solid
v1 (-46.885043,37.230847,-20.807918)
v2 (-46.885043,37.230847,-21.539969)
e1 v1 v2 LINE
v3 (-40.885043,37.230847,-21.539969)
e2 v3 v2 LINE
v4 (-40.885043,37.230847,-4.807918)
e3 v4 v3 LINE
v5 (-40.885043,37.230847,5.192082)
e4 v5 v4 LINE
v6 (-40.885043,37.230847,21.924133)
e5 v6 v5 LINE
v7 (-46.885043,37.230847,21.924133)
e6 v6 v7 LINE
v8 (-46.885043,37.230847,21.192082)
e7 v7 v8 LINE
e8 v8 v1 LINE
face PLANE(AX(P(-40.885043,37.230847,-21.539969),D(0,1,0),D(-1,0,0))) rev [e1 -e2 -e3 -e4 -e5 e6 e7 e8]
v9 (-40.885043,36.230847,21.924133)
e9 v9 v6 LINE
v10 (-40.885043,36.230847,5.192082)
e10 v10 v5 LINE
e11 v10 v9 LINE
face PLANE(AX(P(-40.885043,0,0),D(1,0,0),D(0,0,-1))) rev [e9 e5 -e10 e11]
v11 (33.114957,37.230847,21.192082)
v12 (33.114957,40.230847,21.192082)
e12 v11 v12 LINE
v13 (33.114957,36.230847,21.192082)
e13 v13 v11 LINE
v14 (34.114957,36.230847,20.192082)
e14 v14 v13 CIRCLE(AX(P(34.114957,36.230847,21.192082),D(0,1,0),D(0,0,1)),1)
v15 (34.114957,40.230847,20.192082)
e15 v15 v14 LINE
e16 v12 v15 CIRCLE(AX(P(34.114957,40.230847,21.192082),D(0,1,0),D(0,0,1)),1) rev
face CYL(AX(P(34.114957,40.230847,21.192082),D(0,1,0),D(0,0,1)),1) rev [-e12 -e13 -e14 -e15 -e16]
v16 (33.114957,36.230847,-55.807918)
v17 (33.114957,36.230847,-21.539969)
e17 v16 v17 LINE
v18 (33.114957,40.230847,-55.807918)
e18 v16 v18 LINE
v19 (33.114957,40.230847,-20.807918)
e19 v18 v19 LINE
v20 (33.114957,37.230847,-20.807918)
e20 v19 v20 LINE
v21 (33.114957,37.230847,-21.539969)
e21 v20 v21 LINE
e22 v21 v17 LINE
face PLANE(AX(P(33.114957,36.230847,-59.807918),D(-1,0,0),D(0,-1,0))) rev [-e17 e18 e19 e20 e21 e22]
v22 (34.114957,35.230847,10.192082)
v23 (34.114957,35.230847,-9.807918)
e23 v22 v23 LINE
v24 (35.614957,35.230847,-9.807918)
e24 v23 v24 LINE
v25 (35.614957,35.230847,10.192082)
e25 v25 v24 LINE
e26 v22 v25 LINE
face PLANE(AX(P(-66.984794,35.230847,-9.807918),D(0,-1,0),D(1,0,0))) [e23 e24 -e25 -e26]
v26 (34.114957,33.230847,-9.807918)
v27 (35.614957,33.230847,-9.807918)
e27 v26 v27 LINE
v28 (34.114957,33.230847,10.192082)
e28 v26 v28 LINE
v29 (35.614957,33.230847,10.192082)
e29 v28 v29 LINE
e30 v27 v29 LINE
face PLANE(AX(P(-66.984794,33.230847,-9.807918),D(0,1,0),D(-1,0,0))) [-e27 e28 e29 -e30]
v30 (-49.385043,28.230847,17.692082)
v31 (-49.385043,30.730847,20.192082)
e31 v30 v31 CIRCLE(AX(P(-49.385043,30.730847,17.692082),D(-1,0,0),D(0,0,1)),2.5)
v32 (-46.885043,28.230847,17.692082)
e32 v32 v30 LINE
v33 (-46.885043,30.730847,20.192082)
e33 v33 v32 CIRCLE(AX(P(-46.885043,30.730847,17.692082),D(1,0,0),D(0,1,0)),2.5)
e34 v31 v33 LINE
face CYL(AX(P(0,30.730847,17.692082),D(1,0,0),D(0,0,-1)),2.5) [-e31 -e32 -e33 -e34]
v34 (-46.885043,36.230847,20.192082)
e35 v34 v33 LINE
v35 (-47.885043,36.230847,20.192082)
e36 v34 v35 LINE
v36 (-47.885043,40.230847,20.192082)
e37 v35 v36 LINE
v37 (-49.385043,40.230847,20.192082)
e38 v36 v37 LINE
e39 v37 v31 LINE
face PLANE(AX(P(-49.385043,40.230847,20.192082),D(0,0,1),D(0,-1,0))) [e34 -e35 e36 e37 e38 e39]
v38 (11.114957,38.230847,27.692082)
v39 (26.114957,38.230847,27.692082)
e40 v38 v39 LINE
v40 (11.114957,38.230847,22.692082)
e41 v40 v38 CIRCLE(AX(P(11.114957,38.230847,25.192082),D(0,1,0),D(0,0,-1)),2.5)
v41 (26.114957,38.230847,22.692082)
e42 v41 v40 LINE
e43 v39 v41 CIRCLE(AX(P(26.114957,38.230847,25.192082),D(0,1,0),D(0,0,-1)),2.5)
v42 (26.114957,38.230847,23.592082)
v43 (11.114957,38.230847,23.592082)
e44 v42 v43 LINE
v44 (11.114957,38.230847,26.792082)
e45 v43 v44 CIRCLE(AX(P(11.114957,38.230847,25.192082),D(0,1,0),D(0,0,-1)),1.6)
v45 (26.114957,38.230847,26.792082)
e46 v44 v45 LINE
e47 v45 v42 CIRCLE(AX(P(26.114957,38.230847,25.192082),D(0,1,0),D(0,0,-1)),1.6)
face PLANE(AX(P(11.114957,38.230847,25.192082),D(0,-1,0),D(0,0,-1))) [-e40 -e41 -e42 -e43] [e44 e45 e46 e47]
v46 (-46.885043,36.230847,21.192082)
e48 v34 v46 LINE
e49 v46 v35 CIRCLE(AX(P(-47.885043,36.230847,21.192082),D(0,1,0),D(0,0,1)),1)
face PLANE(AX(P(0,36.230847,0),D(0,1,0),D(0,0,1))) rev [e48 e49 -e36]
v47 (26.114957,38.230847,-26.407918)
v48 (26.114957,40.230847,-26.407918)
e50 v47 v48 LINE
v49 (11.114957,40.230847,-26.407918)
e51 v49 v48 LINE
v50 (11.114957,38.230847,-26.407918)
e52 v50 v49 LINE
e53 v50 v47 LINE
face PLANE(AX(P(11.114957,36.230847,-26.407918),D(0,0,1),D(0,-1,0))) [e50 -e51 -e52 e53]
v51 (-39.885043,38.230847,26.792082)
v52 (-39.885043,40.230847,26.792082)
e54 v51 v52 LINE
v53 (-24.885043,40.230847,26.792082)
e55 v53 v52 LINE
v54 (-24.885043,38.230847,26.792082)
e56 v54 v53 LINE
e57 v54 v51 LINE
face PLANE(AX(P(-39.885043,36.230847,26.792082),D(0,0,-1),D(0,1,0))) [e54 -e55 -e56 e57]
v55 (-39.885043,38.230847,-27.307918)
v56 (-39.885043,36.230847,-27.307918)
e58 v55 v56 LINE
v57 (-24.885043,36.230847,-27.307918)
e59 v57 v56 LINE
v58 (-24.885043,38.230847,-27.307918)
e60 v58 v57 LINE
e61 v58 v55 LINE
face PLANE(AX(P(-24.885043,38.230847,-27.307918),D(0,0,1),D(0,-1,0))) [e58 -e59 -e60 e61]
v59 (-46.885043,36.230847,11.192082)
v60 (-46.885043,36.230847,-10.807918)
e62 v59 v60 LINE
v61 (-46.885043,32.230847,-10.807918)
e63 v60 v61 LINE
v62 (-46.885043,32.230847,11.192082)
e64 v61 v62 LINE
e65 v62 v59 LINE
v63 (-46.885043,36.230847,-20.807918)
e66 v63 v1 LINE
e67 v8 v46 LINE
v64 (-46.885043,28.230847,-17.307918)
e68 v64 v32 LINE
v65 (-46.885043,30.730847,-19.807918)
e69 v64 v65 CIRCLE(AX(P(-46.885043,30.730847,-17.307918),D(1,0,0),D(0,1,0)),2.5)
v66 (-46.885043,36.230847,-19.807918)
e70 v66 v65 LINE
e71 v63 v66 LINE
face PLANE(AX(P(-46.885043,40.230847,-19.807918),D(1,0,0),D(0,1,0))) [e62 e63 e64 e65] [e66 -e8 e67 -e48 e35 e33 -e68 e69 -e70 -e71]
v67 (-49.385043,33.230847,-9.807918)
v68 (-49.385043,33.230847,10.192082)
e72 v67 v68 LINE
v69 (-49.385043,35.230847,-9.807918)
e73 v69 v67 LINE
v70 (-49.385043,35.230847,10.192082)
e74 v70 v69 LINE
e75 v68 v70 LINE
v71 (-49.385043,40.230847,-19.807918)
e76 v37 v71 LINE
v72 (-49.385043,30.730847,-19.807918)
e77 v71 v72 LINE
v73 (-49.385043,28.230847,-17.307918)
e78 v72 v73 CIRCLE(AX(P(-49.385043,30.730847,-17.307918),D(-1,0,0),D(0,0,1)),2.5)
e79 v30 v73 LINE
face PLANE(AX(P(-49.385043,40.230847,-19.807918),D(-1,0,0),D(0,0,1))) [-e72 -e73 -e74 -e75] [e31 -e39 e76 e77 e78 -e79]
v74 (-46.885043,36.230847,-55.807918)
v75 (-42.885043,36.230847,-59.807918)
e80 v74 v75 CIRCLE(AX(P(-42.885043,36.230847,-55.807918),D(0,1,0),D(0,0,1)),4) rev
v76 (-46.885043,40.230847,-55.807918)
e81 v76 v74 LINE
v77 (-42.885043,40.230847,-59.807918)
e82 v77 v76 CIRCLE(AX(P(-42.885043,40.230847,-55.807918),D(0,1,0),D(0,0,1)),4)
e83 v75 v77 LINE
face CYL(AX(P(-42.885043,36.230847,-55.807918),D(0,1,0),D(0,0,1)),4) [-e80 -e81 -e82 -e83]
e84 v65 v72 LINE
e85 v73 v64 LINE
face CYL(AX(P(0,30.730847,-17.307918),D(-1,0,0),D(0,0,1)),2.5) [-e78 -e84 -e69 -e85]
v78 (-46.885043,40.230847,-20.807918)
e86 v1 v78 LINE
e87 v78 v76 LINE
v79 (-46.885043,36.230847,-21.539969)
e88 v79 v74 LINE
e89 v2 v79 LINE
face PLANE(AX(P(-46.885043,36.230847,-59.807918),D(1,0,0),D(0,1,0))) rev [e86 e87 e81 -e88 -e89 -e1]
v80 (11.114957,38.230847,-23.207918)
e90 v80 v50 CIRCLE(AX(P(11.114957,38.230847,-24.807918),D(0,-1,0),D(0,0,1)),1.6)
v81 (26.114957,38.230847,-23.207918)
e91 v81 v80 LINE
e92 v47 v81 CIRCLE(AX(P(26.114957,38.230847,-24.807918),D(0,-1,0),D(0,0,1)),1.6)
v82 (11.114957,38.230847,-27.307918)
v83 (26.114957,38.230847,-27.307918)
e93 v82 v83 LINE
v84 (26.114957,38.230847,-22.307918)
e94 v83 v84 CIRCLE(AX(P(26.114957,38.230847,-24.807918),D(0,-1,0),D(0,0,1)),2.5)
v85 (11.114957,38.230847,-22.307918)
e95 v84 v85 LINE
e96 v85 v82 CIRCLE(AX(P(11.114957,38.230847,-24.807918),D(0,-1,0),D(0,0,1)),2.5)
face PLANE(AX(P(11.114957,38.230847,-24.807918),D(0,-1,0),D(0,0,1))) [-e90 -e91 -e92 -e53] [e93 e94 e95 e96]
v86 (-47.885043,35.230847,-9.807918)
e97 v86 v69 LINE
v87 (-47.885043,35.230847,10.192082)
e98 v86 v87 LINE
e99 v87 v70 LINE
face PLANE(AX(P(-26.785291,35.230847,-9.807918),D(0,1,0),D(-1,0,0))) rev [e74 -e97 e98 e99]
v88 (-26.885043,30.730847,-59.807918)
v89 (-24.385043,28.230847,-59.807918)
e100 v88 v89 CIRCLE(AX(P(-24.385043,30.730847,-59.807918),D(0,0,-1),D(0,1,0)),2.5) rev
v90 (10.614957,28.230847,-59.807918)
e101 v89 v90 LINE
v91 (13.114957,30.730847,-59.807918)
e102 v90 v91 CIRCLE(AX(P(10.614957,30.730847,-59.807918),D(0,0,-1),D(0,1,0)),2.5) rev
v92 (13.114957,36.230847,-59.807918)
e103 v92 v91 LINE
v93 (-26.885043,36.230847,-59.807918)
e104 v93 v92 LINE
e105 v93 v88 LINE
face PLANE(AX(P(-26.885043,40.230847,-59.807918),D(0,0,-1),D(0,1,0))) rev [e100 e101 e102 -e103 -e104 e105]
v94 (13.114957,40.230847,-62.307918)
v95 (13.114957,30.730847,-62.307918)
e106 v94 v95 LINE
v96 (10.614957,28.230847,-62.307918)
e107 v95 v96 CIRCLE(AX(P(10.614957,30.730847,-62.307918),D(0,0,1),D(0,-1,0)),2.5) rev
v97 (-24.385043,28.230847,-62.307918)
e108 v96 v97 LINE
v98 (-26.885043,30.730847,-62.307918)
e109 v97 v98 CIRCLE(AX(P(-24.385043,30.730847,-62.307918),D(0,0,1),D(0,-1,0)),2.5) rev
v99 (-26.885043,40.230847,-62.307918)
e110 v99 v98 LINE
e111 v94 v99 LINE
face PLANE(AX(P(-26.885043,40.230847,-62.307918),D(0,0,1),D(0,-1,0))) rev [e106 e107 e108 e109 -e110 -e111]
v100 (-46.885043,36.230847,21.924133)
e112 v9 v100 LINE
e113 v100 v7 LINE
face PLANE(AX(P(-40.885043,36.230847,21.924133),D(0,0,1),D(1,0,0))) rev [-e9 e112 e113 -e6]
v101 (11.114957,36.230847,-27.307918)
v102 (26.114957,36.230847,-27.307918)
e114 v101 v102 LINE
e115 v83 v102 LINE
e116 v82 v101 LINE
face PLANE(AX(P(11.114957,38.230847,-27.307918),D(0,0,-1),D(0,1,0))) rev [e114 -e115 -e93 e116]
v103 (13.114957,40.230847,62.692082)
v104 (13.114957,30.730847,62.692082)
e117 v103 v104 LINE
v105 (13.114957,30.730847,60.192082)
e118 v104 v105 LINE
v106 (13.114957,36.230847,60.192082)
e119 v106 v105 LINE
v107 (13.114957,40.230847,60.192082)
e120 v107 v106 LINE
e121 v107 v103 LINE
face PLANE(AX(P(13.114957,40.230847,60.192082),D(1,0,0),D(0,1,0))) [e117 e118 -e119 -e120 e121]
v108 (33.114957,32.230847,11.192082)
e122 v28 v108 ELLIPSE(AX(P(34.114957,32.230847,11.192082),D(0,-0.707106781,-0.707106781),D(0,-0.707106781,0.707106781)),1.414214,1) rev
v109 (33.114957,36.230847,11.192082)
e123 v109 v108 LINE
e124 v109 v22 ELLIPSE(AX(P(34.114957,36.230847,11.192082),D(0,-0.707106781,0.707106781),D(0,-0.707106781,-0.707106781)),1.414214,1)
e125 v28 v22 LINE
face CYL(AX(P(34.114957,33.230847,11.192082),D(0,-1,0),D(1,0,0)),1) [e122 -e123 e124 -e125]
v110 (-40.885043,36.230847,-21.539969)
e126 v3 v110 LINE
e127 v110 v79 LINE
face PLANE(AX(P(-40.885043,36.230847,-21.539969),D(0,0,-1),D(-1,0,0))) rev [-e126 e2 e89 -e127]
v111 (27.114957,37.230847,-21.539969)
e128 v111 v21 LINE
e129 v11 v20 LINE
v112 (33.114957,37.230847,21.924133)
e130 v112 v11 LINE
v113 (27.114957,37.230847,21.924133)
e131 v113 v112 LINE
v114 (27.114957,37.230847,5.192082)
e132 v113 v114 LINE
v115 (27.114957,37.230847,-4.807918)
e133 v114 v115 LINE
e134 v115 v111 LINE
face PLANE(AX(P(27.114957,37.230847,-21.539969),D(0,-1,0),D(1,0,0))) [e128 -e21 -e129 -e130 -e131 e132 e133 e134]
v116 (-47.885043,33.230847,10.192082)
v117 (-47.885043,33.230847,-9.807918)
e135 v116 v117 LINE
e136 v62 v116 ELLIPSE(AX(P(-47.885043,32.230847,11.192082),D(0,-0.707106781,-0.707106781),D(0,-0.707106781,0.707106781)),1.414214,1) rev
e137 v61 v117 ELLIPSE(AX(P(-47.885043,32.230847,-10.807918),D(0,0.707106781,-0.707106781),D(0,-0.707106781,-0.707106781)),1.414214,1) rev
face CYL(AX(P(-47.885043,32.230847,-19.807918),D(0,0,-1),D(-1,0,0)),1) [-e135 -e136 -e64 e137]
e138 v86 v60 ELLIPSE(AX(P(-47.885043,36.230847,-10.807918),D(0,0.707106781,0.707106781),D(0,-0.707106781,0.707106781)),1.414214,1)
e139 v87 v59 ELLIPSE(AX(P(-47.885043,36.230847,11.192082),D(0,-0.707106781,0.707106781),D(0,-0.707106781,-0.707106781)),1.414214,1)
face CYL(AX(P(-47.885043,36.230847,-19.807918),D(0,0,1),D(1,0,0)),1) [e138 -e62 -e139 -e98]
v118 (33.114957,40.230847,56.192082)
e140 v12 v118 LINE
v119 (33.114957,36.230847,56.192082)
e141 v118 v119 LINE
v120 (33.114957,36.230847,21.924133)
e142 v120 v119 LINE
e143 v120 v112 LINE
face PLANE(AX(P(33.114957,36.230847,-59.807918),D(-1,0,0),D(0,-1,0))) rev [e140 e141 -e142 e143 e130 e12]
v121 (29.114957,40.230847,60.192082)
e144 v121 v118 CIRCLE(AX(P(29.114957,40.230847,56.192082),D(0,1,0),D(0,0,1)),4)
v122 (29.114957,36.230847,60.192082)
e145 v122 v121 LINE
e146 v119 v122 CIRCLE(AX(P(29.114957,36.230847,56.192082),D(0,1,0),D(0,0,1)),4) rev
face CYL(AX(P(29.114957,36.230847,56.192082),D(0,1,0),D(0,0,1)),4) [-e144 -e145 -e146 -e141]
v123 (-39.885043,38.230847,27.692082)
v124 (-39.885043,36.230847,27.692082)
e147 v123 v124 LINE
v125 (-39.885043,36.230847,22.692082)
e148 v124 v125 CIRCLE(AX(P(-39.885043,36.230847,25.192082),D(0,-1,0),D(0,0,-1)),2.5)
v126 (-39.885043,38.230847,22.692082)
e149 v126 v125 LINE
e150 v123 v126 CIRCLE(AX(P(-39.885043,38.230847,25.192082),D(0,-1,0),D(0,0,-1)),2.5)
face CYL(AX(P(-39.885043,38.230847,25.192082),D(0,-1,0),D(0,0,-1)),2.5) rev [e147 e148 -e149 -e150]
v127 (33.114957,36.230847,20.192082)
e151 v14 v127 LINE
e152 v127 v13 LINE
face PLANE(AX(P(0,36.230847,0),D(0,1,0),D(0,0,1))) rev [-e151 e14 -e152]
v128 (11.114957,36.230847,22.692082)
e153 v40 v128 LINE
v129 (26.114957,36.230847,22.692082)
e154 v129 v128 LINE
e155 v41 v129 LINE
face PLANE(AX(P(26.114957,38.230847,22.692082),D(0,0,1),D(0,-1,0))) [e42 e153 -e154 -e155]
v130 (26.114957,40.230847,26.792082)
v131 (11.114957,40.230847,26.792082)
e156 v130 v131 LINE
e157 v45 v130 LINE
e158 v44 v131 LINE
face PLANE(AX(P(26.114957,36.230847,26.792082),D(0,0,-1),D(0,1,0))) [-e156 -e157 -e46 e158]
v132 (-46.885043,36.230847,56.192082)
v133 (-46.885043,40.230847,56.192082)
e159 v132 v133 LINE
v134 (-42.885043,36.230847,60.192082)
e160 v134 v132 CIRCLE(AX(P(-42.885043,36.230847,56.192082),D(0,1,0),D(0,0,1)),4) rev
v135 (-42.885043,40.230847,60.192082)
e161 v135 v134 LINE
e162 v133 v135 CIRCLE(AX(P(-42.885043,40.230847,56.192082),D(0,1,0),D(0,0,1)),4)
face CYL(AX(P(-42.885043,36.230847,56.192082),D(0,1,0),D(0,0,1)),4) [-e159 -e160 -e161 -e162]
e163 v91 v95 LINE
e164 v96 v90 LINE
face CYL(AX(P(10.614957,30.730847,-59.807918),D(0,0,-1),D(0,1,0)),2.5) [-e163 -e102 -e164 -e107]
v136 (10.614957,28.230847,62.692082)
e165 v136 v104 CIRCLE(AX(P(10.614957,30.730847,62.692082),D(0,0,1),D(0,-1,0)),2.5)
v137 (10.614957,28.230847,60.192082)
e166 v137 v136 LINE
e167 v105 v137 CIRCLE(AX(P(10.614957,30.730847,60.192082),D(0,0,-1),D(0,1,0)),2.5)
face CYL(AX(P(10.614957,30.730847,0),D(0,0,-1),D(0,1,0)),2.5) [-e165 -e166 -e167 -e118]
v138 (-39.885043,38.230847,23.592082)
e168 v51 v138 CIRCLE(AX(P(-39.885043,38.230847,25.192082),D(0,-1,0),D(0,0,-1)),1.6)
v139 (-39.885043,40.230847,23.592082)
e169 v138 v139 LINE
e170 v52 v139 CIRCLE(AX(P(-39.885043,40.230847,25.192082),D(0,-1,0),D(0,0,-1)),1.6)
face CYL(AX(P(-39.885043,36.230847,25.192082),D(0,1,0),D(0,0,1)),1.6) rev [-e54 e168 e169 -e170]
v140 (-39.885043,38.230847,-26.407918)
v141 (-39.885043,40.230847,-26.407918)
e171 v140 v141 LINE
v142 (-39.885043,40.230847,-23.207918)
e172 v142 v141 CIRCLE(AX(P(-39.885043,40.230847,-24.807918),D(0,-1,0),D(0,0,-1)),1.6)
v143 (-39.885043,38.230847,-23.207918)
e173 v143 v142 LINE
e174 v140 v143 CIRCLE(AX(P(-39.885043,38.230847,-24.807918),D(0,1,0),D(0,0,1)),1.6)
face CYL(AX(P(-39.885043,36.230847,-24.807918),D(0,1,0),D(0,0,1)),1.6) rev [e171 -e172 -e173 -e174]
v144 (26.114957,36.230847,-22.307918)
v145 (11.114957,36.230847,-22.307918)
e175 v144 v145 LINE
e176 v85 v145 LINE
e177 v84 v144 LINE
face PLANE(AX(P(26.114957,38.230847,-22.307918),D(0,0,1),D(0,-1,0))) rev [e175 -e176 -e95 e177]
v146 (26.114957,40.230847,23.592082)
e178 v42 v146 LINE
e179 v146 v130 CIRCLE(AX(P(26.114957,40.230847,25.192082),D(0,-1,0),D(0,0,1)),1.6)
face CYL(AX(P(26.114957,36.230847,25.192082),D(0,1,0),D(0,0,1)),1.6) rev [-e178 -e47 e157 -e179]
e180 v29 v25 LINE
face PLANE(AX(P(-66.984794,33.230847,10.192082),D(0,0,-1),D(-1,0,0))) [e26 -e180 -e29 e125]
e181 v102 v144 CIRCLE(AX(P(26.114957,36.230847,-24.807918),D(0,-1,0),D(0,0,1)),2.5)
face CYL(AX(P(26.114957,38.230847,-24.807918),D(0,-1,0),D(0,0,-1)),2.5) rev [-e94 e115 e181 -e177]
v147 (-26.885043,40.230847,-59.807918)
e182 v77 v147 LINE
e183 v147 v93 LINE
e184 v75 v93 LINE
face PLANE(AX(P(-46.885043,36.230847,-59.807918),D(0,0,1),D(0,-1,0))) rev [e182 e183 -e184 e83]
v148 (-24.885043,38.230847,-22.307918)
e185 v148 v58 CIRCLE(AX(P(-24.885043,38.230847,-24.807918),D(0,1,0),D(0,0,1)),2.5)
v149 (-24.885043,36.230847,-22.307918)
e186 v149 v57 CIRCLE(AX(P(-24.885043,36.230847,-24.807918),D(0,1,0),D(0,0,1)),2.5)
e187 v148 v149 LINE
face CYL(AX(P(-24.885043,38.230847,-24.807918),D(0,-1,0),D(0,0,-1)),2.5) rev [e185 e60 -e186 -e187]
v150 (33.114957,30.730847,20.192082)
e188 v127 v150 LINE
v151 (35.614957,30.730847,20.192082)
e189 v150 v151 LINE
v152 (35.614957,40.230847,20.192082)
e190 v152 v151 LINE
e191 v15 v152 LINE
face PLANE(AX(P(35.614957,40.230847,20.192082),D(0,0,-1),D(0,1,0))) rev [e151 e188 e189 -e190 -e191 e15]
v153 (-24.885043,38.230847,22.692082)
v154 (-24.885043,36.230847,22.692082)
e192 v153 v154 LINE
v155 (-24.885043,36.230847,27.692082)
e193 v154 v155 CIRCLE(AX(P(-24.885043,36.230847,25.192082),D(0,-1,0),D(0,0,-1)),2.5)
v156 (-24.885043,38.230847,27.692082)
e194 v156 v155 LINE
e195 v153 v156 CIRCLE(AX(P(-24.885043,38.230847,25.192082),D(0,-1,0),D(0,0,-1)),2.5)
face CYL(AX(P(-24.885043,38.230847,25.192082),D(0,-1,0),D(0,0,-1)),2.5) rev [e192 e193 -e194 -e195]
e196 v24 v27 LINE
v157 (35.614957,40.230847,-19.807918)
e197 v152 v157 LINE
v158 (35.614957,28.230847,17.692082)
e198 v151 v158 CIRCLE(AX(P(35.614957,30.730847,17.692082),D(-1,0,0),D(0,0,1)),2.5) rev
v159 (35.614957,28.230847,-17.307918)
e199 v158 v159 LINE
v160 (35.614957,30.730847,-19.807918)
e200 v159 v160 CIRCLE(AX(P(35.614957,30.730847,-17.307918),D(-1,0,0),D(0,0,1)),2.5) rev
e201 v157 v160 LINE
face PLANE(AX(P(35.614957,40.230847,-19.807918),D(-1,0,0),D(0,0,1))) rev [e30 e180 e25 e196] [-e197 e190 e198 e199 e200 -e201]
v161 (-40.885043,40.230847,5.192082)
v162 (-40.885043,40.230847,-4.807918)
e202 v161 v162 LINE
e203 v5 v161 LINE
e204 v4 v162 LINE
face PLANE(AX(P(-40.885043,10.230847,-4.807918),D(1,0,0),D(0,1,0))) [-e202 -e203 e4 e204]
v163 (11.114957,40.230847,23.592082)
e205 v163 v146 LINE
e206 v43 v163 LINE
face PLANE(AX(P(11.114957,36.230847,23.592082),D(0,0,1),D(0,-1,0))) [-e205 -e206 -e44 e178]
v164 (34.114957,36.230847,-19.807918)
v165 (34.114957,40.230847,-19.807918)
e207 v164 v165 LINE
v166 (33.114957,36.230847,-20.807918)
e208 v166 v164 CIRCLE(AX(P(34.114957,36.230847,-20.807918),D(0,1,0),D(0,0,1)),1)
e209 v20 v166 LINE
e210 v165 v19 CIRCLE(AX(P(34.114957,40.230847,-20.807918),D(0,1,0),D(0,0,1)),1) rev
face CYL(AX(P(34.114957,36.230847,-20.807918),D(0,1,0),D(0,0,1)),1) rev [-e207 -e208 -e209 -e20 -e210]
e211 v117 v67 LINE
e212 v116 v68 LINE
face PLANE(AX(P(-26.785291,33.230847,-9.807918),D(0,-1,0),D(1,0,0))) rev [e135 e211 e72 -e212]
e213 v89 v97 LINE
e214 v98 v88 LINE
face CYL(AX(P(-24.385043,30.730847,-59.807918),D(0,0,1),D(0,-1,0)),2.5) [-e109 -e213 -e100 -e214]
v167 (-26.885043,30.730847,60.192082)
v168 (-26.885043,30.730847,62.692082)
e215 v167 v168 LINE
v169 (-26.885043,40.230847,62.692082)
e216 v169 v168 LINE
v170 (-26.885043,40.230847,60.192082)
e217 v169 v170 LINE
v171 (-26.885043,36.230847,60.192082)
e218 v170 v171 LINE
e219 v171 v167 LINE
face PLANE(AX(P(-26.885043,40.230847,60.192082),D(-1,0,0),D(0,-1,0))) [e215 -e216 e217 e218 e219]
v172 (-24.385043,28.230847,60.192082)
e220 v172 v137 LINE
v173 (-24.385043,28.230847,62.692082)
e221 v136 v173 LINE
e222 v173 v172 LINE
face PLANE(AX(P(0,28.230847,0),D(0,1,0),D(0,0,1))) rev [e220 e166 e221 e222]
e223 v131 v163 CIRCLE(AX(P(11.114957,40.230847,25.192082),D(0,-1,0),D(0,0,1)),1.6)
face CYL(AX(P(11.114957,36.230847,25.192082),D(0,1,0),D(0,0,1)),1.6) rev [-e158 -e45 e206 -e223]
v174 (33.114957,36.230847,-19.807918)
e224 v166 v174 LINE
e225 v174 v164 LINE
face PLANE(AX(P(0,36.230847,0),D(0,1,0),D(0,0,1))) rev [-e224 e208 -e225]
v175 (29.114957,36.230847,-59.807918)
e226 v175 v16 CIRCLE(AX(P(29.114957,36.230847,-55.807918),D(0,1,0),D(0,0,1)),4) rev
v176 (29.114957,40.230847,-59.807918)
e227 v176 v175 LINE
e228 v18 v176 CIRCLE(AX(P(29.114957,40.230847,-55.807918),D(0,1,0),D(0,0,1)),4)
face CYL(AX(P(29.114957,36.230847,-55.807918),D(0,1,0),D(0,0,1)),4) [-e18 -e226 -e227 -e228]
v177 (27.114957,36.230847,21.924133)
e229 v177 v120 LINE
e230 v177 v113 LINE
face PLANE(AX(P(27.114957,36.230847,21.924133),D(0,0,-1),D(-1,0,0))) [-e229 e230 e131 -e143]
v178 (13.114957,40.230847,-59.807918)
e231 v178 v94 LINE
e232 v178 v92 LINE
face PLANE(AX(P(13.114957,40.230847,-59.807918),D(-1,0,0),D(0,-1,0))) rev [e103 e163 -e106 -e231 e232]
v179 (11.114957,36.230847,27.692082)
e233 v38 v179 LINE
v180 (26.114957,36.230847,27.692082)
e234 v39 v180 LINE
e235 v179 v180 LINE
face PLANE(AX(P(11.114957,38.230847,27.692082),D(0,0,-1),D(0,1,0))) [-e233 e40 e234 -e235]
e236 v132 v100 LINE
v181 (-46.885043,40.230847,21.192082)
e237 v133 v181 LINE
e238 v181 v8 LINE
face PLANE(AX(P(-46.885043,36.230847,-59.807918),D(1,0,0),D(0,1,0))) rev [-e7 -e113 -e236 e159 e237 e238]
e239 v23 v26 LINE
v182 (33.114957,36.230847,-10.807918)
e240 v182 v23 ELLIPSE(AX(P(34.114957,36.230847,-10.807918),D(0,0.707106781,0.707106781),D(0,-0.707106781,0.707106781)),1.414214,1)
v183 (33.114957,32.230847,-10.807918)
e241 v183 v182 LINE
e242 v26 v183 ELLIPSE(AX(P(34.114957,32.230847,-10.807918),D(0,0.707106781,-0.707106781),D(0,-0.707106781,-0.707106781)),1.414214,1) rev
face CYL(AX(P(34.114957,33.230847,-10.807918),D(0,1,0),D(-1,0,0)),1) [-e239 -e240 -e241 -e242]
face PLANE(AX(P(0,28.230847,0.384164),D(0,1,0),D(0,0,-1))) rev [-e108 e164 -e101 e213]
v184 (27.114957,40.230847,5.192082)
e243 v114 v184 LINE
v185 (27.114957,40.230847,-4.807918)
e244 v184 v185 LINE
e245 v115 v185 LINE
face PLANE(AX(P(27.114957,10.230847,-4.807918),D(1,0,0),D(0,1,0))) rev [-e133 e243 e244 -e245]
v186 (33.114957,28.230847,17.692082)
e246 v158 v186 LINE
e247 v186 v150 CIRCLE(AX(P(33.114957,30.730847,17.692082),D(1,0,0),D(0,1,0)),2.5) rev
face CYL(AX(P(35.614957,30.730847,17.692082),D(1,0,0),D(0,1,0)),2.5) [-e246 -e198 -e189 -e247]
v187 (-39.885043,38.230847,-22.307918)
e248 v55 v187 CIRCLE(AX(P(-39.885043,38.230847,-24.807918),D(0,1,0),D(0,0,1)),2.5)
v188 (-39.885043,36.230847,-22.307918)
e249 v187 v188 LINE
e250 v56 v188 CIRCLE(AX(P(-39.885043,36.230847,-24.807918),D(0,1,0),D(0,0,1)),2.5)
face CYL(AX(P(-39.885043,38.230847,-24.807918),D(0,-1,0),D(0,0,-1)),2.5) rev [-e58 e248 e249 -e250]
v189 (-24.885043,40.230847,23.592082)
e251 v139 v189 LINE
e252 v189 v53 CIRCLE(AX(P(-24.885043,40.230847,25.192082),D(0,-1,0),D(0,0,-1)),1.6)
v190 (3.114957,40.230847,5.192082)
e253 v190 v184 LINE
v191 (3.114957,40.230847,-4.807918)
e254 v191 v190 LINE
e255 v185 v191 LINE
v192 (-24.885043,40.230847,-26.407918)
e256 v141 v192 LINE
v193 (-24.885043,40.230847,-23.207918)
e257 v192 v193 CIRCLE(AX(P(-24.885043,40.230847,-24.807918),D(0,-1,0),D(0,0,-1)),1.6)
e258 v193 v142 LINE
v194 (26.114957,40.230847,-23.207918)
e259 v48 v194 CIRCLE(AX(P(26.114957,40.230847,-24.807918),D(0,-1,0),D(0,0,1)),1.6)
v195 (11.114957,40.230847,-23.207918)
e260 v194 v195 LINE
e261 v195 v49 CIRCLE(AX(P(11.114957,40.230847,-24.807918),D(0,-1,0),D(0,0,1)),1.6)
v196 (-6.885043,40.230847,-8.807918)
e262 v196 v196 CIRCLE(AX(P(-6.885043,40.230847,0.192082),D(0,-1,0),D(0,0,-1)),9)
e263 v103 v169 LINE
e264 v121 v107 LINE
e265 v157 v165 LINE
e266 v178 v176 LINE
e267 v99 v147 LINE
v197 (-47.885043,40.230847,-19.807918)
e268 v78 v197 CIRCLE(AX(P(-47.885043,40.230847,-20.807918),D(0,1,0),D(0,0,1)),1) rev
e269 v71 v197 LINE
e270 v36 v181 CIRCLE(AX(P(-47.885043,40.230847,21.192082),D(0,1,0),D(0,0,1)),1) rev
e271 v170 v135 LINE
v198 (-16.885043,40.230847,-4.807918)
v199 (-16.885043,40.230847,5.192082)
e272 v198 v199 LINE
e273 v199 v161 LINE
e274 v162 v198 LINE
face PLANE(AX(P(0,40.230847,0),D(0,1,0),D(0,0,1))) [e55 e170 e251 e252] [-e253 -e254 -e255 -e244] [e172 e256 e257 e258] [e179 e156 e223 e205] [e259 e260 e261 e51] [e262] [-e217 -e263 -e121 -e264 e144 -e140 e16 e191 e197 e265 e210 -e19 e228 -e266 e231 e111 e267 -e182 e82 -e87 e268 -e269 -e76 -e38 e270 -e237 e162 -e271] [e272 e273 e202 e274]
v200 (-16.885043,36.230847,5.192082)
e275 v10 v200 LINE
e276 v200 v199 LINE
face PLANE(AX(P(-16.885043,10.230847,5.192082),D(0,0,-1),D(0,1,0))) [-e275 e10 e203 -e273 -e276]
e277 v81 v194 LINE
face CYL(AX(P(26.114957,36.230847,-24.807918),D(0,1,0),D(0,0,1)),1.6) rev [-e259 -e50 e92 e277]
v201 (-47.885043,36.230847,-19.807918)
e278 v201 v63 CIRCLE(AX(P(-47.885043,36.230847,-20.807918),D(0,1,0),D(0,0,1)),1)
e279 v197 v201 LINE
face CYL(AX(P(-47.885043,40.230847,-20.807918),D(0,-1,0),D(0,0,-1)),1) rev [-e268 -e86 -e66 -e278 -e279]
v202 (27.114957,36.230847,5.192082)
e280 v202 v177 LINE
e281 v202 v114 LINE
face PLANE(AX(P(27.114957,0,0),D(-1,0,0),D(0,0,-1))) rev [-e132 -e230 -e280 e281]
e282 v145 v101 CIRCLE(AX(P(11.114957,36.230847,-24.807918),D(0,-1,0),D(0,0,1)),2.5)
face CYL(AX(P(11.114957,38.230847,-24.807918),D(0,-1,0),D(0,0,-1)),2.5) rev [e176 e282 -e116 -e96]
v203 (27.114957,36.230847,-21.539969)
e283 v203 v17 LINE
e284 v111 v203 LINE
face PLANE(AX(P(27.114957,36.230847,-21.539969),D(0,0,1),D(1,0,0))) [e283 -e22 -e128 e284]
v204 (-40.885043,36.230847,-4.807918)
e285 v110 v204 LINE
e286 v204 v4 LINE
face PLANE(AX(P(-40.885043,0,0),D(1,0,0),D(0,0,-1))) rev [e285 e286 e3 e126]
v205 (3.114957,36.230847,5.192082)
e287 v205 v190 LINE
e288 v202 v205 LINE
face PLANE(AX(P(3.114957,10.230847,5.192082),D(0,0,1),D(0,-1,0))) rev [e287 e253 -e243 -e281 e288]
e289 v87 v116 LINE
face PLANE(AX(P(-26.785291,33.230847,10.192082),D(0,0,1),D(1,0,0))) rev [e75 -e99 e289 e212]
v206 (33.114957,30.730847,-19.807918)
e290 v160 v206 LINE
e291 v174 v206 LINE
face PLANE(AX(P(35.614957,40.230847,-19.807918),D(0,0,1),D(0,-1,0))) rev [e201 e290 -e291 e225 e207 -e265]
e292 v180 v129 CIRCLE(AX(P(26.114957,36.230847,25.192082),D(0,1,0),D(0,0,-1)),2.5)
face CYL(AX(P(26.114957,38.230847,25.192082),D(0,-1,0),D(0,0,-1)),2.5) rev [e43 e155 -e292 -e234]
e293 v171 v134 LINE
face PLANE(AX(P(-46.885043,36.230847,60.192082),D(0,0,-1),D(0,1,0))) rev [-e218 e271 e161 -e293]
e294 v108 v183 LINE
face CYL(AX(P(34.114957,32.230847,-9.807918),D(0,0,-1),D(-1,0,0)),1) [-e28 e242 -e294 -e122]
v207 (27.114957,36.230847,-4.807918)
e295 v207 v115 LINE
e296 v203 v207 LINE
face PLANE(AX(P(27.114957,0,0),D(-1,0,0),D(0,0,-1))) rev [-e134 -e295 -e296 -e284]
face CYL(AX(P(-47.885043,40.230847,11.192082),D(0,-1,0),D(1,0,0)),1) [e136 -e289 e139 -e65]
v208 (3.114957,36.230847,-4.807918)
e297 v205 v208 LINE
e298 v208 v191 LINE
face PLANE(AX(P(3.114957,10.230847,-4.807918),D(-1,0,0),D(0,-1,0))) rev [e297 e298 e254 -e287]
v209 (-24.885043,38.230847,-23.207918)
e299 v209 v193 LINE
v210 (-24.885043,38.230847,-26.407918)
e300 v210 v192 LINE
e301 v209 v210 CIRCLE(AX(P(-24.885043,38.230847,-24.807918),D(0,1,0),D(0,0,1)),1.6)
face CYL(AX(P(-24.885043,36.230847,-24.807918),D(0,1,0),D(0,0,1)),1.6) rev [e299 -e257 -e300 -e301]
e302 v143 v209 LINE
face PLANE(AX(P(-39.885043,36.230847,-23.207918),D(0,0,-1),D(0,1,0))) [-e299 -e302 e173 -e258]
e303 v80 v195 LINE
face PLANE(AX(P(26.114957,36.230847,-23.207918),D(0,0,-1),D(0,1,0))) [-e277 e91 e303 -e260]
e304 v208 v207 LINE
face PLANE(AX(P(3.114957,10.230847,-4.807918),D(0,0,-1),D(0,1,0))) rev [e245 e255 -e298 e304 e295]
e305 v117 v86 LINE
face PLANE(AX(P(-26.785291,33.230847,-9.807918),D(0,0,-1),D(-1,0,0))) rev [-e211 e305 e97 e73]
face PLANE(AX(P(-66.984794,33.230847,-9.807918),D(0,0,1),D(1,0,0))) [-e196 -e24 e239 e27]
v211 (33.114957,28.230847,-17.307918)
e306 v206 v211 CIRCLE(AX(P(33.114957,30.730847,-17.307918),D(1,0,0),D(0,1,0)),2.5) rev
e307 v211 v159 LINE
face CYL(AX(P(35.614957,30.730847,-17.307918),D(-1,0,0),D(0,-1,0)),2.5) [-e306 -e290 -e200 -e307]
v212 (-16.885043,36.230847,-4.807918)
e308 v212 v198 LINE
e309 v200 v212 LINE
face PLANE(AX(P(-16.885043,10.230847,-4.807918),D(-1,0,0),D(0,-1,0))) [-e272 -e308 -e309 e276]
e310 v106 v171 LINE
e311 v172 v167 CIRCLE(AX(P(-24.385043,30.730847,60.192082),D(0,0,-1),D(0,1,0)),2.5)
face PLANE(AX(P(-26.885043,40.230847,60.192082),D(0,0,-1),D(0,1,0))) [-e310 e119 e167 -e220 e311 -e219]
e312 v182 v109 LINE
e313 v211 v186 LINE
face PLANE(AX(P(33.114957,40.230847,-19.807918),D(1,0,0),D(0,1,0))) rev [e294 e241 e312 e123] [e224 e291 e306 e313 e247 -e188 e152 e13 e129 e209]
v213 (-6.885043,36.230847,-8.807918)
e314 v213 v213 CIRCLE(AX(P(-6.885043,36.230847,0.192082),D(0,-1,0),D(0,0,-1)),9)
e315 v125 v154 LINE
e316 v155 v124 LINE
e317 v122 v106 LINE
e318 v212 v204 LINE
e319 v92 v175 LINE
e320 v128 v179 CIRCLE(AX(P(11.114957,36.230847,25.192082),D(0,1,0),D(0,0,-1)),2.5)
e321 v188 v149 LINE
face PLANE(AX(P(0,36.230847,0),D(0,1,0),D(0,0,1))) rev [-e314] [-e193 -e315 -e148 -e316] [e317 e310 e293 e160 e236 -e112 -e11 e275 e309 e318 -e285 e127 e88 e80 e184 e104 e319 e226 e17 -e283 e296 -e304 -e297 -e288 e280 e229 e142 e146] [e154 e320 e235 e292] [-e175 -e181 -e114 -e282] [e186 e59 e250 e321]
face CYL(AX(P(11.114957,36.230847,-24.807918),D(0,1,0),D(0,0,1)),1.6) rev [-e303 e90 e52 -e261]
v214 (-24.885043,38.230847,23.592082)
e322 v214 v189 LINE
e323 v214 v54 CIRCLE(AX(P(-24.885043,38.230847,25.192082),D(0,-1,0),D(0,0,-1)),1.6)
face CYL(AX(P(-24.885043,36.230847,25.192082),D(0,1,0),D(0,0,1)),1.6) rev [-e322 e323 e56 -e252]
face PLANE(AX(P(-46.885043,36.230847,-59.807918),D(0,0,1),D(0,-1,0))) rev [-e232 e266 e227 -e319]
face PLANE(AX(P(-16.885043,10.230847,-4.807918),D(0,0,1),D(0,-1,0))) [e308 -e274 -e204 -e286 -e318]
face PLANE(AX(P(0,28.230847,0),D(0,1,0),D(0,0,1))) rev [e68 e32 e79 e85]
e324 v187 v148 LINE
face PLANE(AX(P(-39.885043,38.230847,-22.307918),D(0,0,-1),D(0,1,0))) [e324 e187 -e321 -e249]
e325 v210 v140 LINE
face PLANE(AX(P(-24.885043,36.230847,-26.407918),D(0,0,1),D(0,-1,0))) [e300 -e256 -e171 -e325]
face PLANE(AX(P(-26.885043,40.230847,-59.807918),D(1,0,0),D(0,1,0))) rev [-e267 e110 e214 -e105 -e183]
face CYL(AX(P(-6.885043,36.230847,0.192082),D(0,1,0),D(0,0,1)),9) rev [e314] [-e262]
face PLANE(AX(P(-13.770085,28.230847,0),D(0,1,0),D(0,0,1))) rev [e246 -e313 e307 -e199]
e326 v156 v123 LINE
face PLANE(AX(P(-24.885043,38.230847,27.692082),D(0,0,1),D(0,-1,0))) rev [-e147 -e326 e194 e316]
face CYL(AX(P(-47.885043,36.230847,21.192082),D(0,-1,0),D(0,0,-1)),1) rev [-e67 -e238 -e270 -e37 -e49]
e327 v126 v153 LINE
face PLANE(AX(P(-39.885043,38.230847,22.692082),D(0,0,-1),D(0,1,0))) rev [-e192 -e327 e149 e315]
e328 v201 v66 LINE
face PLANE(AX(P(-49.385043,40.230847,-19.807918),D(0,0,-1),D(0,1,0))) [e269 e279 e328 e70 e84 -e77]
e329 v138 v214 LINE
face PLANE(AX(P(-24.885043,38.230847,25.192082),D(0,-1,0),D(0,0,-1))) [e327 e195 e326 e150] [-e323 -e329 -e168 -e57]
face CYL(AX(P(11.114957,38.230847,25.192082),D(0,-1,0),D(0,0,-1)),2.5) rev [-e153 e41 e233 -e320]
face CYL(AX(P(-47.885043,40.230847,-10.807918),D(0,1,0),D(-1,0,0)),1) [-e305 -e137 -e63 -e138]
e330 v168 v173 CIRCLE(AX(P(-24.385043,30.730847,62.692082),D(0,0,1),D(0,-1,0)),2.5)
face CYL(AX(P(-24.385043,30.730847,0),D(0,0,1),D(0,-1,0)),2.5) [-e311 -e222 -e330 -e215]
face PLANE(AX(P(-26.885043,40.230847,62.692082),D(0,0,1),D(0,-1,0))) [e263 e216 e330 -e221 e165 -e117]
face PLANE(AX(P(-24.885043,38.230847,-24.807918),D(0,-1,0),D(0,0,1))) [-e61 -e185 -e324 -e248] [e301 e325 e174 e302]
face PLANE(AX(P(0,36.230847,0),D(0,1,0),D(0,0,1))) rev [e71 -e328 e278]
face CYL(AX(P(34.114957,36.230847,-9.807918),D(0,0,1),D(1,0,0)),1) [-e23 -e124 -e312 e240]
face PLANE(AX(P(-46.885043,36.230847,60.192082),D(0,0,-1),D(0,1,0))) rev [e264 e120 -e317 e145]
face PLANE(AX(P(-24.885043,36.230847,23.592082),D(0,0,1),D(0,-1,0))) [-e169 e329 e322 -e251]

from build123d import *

# Parameters (mm, degrees)
SKETCH2_W                                 = 80
SKETCH2_H                                 = 120
SKETCH2_R                                 = 9
BOSS_EXTRUDE1_DEPTH                       = 4
FILLET1_R                                 = 4
BOSS_EXTRUDE3_START                       = -4
SKETCH3_W                                 = 40
SKETCH3_H                                 = 2.5
BOSS_EXTRUDE3_DEPTH                       = 12
FILLET5_R                                 = 2.5
FILLET5_OF_MIRROR6_R                      = 2.5
BOSS_EXTRUDE4_START                       = -4
SKETCH6_W                                 = 2.5
SKETCH6_H                                 = 39.999999999
BOSS_EXTRUDE4_DEPTH                       = 12
SKETCH13_W                                = 20
SKETCH13_H                                = 2
CUT_EXTRUDE6_DEPTH                        = 2.5
FILLET15_R                                = 1
FILLET15_OF_MIRROR31_R                    = 1
FILLET12_R                                = 1
FILLET9_R                                 = 2.5
SKETCH15_W                                = 24
SKETCH15_H                                = 10
CUT_EXTRUDE7_DEPTH                        = 4
SKETCH16_W                                = 43.464101615
SKETCH16_H                                = 1
CUT_EXTRUDE8_DEPTH                        = 6
CUT_EXTRUDE9_START                        = -2
CUT_EXTRUDE9_DEPTH                        = 2
MIRROR35_START                            = -2
MIRROR35_AT_THE_SECOND_PLANE_COPY_1_DEPTH = 2


with BuildPart() as part:
    # Sketch2 → Boss-Extrude1 (new body)
    with BuildSketch(Plane.XZ.offset(-40.230846757)):
        with Locations((-6.885042722, 0.192082071)):
            Rectangle(SKETCH2_W, SKETCH2_H)
        with Locations(Location((-6.885042722, 0.192082071, 0), (0, 0, 270))):
            Circle(SKETCH2_R, mode=Mode.SUBTRACT)
        with BuildLine():
            Line((-24.885042722, -26.407917929), (-39.885042722, -26.407917929))
            ThreePointArc((-39.885042722, -26.407917929), (-41.485042722, -24.807917929), (-39.885042722, -23.207917929))
            Line((-39.885042722, -23.207917929), (-24.885042722, -23.207917929))
            ThreePointArc((-24.885042722, -23.207917929), (-23.285042722, -24.807917929), (-24.885042722, -26.407917929))
        make_face(mode=Mode.SUBTRACT)
        with BuildLine():
            Line((-24.885042722, 23.592082071), (-39.885042722, 23.592082071))
            ThreePointArc((-39.885042722, 23.592082071), (-41.485042722, 25.192082071), (-39.885042722, 26.792082071))
            Line((-39.885042722, 26.792082071), (-24.885042722, 26.792082071))
            ThreePointArc((-24.885042722, 26.792082071), (-23.285042722, 25.192082071), (-24.885042722, 23.592082071))
        make_face(mode=Mode.SUBTRACT)
        with BuildLine():
            Line((26.114957278, 26.792082071), (11.114957278, 26.792082071))
            ThreePointArc((11.114957278, 26.792082071), (9.514957278, 25.192082071), (11.114957278, 23.592082071))
            Line((11.114957278, 23.592082071), (26.114957278, 23.592082071))
            ThreePointArc((26.114957278, 23.592082071), (27.714957278, 25.192082071), (26.114957278, 26.792082071))
        make_face(mode=Mode.SUBTRACT)
        with BuildLine():
            Line((26.114957278, -23.207917929), (11.114957278, -23.207917929))
            ThreePointArc((11.114957278, -23.207917929), (9.514957278, -24.807917929), (11.114957278, -26.407917929))
            Line((11.114957278, -26.407917929), (26.114957278, -26.407917929))
            ThreePointArc((26.114957278, -26.407917929), (27.714957278, -24.807917929), (26.114957278, -23.207917929))
        make_face(mode=Mode.SUBTRACT)
    extrude(amount=BOSS_EXTRUDE1_DEPTH)

    # Fillet1
    fillet1_edges = [part.edges().sort_by_distance(p)[0] for p in [
        (33.114957278, 38.230846757, -59.807917929),
        (-46.885042722, 38.230846757, -59.807917929),
        (-46.885042722, 38.230846757, 60.192082071),
        (33.114957278, 38.230846757, 60.192082071),
    ]]
    fillet(fillet1_edges, radius=FILLET1_R)

    # Sketch3 → Boss-Extrude3 (add)
    with BuildSketch(Plane.XZ.offset(-36.230846757).offset(BOSS_EXTRUDE3_START)):
        with Locations((-6.885042722, 61.442082071)):
            Rectangle(SKETCH3_W, SKETCH3_H)
    boss_extrude3 = extrude(amount=BOSS_EXTRUDE3_DEPTH)

    # Fillet5
    fillet5_edges = [part.edges().sort_by_distance(p)[0] for p in [
        (13.114957278, 28.230846757, 61.442082071),
        (-26.885042722, 28.230846757, 61.442082071),
    ]]
    fillet(fillet5_edges, radius=FILLET5_R)

    # Mirror6: Boss-Extrude3 across plane
    add(boss_extrude3.mirror(Plane(origin=(0, 0, 0.192082071), x_dir=(1, 0, 0), z_dir=(0, 0, -1))))

    # Fillet5 of Mirror6
    fillet5_of_mirror6_edges = [part.edges().sort_by_distance(p)[0] for p in [
        (13.114957278, 28.230846757, -61.057917929),
        (-26.885042722, 28.230846757, -61.057917929),
    ]]
    fillet(fillet5_of_mirror6_edges, radius=FILLET5_OF_MIRROR6_R)

    # Sketch6 → Boss-Extrude4 (add)
    with BuildSketch(Plane.XZ.offset(-36.230846757).offset(BOSS_EXTRUDE4_START)):
        with Locations((-48.135042722, 0.19208207)):
            Rectangle(SKETCH6_W, SKETCH6_H)
    boss_extrude4 = extrude(amount=BOSS_EXTRUDE4_DEPTH)

    # Sketch13 → Cut-Extrude6 (cut)
    with BuildSketch(Plane.ZY.offset(49.385042722)):
        with Locations((0.192082071, 34.230846757)):
            Rectangle(SKETCH13_W, SKETCH13_H)
    cut_extrude6 = extrude(amount=-CUT_EXTRUDE6_DEPTH, mode=Mode.SUBTRACT)

    # Fillet15
    fillet15_edges = [part.edges().sort_by_distance(p)[0] for p in [
        (-46.885042722, 35.230846757, 0.192082071),
        (-46.885042722, 34.230846757, -9.807917929),
        (-46.885042722, 33.230846757, 0.192082071),
        (-46.885042722, 34.230846757, 10.192082071),
    ]]
    fillet(fillet15_edges, radius=FILLET15_R - 0.0001)  # a hair under: the kernel refuses the full size

    # Mirror31: Boss-Extrude4, Cut-Extrude6 across plane
    add(boss_extrude4.mirror(Plane.ZY.offset(6.885042722)))
    add(cut_extrude6.mirror(Plane.ZY.offset(6.885042722)), mode=Mode.SUBTRACT)

    # Fillet15 of Mirror31
    fillet15_of_mirror31_edges = [part.edges().sort_by_distance(p)[0] for p in [
        (33.114957278, 35.230846757, 0.192082071),
        (33.114957278, 34.230846757, -9.807917929),
        (33.114957278, 33.230846757, 0.192082071),
        (33.114957278, 34.230846757, 10.192082071),
    ]]
    fillet(fillet15_of_mirror31_edges, radius=FILLET15_OF_MIRROR31_R - 0.0001)  # a hair under: the kernel refuses the full size

    # Fillet12
    fillet12_edges = [part.edges().sort_by_distance(p)[0] for p in [
        (-46.885042722, 38.230846757, 20.19208207),
        (-46.885042722, 38.230846757, -19.807917929),
        (33.114957278, 38.230846757, -19.807917929),
        (33.114957278, 38.230846757, 20.19208207),
    ]]
    fillet(fillet12_edges, radius=FILLET12_R)

    # Fillet9
    fillet9_edges = [part.edges().sort_by_distance(p)[0] for p in [
        (-48.135042722, 28.230846757, -19.807917929),
        (-48.135042722, 28.230846757, 20.19208207),
        (34.364957278, 28.230846757, -19.807917929),
        (34.364957278, 28.230846757, 20.19208207),
    ]]
    fillet(fillet9_edges, radius=FILLET9_R)

    # Sketch15 → Cut-Extrude7 (cut)
    with BuildSketch(Plane(origin=(0, 40.230846757, 0), x_dir=(1, 0, 0), z_dir=(0, 1, 0))):
        with Locations((15.114957278, -0.192082071)):
            Rectangle(SKETCH15_W, SKETCH15_H)
    cut_extrude7 = extrude(amount=-CUT_EXTRUDE7_DEPTH, mode=Mode.SUBTRACT)

    # Mirror32: Cut-Extrude7 across plane
    add(cut_extrude7.mirror(Plane.ZY.offset(6.885042722)), mode=Mode.SUBTRACT)

    # Sketch16 → Cut-Extrude8 (cut)
    with BuildSketch(Plane.ZY.offset(46.885042722)):
        with Locations((0.19208207, 36.730846757)):
            Rectangle(SKETCH16_W, SKETCH16_H)
    cut_extrude8 = extrude(amount=-CUT_EXTRUDE8_DEPTH, mode=Mode.SUBTRACT)

    # Mirror34: Cut-Extrude8 across plane
    add(cut_extrude8.mirror(Plane.ZY.offset(6.885042722)), mode=Mode.SUBTRACT)

    # Sketch17 → Cut-Extrude9 (cut)
    with BuildSketch(Plane.XZ.offset(-36.230846757).offset(CUT_EXTRUDE9_START)):
        with BuildLine():
            Line((-39.885042722, 22.692082071), (-24.885042722, 22.692082071))
            ThreePointArc((-24.885042722, 22.692082071), (-22.385042722, 25.192082071), (-24.885042722, 27.692082071))
            Line((-24.885042722, 27.692082071), (-39.885042722, 27.692082071))
            ThreePointArc((-39.885042722, 27.692082071), (-42.385042722, 25.192082071), (-39.885042722, 22.692082071))
        make_face()
        with BuildLine():
            Line((-39.885042722, 23.592082071), (-24.885042722, 23.592082071))
            ThreePointArc((-24.885042722, 23.592082071), (-23.285042722, 25.192082071), (-24.885042722, 26.792082071))
            Line((-24.885042722, 26.792082071), (-39.885042722, 26.792082071))
            ThreePointArc((-39.885042722, 26.792082071), (-41.485042722, 25.192082071), (-39.885042722, 23.592082071))
        make_face(mode=Mode.SUBTRACT)
    cut_extrude9 = extrude(amount=CUT_EXTRUDE9_DEPTH, mode=Mode.SUBTRACT)

    # Mirror35: Cut-Extrude9 across plane
    add(cut_extrude9.mirror(Plane(origin=(0, 0, 0.192082071), x_dir=(1, 0, 0), z_dir=(0, 0, -1))), mode=Mode.SUBTRACT)

    # Mirror35 at the second plane: Cut-Extrude9 across plane
    add(cut_extrude9.mirror(Plane.ZY.offset(6.885042722)), mode=Mode.SUBTRACT)

    # Mirror35 at the second plane copy 1 sket → Mirror35 at the second plane copy 1 (cut)
    with BuildSketch(Plane(origin=(-13.770085443, 36.230846757, 0.384164141), x_dir=(-1, 0, 0), z_dir=(0, -1, 0)).offset(MIRROR35_START)):
        with BuildLine():
            Line((-39.885042722, 22.692082071), (-24.885042722, 22.692082071))
            ThreePointArc((-24.885042722, 22.692082071), (-22.385042722, 25.192082071), (-24.885042722, 27.692082071))
            Line((-24.885042722, 27.692082071), (-39.885042722, 27.692082071))
            ThreePointArc((-39.885042722, 27.692082071), (-42.385042722, 25.192082071), (-39.885042722, 22.692082071))
        make_face()
        with BuildLine():
            Line((-39.885042722, 23.592082071), (-24.885042722, 23.592082071))
            ThreePointArc((-24.885042722, 23.592082071), (-23.285042722, 25.192082071), (-24.885042722, 26.792082071))
            Line((-24.885042722, 26.792082071), (-39.885042722, 26.792082071))
            ThreePointArc((-39.885042722, 26.792082071), (-41.485042722, 25.192082071), (-39.885042722, 23.592082071))
        make_face(mode=Mode.SUBTRACT)
    extrude(amount=MIRROR35_AT_THE_SECOND_PLANE_COPY_1_DEPTH, mode=Mode.SUBTRACT)


solid = part.part
